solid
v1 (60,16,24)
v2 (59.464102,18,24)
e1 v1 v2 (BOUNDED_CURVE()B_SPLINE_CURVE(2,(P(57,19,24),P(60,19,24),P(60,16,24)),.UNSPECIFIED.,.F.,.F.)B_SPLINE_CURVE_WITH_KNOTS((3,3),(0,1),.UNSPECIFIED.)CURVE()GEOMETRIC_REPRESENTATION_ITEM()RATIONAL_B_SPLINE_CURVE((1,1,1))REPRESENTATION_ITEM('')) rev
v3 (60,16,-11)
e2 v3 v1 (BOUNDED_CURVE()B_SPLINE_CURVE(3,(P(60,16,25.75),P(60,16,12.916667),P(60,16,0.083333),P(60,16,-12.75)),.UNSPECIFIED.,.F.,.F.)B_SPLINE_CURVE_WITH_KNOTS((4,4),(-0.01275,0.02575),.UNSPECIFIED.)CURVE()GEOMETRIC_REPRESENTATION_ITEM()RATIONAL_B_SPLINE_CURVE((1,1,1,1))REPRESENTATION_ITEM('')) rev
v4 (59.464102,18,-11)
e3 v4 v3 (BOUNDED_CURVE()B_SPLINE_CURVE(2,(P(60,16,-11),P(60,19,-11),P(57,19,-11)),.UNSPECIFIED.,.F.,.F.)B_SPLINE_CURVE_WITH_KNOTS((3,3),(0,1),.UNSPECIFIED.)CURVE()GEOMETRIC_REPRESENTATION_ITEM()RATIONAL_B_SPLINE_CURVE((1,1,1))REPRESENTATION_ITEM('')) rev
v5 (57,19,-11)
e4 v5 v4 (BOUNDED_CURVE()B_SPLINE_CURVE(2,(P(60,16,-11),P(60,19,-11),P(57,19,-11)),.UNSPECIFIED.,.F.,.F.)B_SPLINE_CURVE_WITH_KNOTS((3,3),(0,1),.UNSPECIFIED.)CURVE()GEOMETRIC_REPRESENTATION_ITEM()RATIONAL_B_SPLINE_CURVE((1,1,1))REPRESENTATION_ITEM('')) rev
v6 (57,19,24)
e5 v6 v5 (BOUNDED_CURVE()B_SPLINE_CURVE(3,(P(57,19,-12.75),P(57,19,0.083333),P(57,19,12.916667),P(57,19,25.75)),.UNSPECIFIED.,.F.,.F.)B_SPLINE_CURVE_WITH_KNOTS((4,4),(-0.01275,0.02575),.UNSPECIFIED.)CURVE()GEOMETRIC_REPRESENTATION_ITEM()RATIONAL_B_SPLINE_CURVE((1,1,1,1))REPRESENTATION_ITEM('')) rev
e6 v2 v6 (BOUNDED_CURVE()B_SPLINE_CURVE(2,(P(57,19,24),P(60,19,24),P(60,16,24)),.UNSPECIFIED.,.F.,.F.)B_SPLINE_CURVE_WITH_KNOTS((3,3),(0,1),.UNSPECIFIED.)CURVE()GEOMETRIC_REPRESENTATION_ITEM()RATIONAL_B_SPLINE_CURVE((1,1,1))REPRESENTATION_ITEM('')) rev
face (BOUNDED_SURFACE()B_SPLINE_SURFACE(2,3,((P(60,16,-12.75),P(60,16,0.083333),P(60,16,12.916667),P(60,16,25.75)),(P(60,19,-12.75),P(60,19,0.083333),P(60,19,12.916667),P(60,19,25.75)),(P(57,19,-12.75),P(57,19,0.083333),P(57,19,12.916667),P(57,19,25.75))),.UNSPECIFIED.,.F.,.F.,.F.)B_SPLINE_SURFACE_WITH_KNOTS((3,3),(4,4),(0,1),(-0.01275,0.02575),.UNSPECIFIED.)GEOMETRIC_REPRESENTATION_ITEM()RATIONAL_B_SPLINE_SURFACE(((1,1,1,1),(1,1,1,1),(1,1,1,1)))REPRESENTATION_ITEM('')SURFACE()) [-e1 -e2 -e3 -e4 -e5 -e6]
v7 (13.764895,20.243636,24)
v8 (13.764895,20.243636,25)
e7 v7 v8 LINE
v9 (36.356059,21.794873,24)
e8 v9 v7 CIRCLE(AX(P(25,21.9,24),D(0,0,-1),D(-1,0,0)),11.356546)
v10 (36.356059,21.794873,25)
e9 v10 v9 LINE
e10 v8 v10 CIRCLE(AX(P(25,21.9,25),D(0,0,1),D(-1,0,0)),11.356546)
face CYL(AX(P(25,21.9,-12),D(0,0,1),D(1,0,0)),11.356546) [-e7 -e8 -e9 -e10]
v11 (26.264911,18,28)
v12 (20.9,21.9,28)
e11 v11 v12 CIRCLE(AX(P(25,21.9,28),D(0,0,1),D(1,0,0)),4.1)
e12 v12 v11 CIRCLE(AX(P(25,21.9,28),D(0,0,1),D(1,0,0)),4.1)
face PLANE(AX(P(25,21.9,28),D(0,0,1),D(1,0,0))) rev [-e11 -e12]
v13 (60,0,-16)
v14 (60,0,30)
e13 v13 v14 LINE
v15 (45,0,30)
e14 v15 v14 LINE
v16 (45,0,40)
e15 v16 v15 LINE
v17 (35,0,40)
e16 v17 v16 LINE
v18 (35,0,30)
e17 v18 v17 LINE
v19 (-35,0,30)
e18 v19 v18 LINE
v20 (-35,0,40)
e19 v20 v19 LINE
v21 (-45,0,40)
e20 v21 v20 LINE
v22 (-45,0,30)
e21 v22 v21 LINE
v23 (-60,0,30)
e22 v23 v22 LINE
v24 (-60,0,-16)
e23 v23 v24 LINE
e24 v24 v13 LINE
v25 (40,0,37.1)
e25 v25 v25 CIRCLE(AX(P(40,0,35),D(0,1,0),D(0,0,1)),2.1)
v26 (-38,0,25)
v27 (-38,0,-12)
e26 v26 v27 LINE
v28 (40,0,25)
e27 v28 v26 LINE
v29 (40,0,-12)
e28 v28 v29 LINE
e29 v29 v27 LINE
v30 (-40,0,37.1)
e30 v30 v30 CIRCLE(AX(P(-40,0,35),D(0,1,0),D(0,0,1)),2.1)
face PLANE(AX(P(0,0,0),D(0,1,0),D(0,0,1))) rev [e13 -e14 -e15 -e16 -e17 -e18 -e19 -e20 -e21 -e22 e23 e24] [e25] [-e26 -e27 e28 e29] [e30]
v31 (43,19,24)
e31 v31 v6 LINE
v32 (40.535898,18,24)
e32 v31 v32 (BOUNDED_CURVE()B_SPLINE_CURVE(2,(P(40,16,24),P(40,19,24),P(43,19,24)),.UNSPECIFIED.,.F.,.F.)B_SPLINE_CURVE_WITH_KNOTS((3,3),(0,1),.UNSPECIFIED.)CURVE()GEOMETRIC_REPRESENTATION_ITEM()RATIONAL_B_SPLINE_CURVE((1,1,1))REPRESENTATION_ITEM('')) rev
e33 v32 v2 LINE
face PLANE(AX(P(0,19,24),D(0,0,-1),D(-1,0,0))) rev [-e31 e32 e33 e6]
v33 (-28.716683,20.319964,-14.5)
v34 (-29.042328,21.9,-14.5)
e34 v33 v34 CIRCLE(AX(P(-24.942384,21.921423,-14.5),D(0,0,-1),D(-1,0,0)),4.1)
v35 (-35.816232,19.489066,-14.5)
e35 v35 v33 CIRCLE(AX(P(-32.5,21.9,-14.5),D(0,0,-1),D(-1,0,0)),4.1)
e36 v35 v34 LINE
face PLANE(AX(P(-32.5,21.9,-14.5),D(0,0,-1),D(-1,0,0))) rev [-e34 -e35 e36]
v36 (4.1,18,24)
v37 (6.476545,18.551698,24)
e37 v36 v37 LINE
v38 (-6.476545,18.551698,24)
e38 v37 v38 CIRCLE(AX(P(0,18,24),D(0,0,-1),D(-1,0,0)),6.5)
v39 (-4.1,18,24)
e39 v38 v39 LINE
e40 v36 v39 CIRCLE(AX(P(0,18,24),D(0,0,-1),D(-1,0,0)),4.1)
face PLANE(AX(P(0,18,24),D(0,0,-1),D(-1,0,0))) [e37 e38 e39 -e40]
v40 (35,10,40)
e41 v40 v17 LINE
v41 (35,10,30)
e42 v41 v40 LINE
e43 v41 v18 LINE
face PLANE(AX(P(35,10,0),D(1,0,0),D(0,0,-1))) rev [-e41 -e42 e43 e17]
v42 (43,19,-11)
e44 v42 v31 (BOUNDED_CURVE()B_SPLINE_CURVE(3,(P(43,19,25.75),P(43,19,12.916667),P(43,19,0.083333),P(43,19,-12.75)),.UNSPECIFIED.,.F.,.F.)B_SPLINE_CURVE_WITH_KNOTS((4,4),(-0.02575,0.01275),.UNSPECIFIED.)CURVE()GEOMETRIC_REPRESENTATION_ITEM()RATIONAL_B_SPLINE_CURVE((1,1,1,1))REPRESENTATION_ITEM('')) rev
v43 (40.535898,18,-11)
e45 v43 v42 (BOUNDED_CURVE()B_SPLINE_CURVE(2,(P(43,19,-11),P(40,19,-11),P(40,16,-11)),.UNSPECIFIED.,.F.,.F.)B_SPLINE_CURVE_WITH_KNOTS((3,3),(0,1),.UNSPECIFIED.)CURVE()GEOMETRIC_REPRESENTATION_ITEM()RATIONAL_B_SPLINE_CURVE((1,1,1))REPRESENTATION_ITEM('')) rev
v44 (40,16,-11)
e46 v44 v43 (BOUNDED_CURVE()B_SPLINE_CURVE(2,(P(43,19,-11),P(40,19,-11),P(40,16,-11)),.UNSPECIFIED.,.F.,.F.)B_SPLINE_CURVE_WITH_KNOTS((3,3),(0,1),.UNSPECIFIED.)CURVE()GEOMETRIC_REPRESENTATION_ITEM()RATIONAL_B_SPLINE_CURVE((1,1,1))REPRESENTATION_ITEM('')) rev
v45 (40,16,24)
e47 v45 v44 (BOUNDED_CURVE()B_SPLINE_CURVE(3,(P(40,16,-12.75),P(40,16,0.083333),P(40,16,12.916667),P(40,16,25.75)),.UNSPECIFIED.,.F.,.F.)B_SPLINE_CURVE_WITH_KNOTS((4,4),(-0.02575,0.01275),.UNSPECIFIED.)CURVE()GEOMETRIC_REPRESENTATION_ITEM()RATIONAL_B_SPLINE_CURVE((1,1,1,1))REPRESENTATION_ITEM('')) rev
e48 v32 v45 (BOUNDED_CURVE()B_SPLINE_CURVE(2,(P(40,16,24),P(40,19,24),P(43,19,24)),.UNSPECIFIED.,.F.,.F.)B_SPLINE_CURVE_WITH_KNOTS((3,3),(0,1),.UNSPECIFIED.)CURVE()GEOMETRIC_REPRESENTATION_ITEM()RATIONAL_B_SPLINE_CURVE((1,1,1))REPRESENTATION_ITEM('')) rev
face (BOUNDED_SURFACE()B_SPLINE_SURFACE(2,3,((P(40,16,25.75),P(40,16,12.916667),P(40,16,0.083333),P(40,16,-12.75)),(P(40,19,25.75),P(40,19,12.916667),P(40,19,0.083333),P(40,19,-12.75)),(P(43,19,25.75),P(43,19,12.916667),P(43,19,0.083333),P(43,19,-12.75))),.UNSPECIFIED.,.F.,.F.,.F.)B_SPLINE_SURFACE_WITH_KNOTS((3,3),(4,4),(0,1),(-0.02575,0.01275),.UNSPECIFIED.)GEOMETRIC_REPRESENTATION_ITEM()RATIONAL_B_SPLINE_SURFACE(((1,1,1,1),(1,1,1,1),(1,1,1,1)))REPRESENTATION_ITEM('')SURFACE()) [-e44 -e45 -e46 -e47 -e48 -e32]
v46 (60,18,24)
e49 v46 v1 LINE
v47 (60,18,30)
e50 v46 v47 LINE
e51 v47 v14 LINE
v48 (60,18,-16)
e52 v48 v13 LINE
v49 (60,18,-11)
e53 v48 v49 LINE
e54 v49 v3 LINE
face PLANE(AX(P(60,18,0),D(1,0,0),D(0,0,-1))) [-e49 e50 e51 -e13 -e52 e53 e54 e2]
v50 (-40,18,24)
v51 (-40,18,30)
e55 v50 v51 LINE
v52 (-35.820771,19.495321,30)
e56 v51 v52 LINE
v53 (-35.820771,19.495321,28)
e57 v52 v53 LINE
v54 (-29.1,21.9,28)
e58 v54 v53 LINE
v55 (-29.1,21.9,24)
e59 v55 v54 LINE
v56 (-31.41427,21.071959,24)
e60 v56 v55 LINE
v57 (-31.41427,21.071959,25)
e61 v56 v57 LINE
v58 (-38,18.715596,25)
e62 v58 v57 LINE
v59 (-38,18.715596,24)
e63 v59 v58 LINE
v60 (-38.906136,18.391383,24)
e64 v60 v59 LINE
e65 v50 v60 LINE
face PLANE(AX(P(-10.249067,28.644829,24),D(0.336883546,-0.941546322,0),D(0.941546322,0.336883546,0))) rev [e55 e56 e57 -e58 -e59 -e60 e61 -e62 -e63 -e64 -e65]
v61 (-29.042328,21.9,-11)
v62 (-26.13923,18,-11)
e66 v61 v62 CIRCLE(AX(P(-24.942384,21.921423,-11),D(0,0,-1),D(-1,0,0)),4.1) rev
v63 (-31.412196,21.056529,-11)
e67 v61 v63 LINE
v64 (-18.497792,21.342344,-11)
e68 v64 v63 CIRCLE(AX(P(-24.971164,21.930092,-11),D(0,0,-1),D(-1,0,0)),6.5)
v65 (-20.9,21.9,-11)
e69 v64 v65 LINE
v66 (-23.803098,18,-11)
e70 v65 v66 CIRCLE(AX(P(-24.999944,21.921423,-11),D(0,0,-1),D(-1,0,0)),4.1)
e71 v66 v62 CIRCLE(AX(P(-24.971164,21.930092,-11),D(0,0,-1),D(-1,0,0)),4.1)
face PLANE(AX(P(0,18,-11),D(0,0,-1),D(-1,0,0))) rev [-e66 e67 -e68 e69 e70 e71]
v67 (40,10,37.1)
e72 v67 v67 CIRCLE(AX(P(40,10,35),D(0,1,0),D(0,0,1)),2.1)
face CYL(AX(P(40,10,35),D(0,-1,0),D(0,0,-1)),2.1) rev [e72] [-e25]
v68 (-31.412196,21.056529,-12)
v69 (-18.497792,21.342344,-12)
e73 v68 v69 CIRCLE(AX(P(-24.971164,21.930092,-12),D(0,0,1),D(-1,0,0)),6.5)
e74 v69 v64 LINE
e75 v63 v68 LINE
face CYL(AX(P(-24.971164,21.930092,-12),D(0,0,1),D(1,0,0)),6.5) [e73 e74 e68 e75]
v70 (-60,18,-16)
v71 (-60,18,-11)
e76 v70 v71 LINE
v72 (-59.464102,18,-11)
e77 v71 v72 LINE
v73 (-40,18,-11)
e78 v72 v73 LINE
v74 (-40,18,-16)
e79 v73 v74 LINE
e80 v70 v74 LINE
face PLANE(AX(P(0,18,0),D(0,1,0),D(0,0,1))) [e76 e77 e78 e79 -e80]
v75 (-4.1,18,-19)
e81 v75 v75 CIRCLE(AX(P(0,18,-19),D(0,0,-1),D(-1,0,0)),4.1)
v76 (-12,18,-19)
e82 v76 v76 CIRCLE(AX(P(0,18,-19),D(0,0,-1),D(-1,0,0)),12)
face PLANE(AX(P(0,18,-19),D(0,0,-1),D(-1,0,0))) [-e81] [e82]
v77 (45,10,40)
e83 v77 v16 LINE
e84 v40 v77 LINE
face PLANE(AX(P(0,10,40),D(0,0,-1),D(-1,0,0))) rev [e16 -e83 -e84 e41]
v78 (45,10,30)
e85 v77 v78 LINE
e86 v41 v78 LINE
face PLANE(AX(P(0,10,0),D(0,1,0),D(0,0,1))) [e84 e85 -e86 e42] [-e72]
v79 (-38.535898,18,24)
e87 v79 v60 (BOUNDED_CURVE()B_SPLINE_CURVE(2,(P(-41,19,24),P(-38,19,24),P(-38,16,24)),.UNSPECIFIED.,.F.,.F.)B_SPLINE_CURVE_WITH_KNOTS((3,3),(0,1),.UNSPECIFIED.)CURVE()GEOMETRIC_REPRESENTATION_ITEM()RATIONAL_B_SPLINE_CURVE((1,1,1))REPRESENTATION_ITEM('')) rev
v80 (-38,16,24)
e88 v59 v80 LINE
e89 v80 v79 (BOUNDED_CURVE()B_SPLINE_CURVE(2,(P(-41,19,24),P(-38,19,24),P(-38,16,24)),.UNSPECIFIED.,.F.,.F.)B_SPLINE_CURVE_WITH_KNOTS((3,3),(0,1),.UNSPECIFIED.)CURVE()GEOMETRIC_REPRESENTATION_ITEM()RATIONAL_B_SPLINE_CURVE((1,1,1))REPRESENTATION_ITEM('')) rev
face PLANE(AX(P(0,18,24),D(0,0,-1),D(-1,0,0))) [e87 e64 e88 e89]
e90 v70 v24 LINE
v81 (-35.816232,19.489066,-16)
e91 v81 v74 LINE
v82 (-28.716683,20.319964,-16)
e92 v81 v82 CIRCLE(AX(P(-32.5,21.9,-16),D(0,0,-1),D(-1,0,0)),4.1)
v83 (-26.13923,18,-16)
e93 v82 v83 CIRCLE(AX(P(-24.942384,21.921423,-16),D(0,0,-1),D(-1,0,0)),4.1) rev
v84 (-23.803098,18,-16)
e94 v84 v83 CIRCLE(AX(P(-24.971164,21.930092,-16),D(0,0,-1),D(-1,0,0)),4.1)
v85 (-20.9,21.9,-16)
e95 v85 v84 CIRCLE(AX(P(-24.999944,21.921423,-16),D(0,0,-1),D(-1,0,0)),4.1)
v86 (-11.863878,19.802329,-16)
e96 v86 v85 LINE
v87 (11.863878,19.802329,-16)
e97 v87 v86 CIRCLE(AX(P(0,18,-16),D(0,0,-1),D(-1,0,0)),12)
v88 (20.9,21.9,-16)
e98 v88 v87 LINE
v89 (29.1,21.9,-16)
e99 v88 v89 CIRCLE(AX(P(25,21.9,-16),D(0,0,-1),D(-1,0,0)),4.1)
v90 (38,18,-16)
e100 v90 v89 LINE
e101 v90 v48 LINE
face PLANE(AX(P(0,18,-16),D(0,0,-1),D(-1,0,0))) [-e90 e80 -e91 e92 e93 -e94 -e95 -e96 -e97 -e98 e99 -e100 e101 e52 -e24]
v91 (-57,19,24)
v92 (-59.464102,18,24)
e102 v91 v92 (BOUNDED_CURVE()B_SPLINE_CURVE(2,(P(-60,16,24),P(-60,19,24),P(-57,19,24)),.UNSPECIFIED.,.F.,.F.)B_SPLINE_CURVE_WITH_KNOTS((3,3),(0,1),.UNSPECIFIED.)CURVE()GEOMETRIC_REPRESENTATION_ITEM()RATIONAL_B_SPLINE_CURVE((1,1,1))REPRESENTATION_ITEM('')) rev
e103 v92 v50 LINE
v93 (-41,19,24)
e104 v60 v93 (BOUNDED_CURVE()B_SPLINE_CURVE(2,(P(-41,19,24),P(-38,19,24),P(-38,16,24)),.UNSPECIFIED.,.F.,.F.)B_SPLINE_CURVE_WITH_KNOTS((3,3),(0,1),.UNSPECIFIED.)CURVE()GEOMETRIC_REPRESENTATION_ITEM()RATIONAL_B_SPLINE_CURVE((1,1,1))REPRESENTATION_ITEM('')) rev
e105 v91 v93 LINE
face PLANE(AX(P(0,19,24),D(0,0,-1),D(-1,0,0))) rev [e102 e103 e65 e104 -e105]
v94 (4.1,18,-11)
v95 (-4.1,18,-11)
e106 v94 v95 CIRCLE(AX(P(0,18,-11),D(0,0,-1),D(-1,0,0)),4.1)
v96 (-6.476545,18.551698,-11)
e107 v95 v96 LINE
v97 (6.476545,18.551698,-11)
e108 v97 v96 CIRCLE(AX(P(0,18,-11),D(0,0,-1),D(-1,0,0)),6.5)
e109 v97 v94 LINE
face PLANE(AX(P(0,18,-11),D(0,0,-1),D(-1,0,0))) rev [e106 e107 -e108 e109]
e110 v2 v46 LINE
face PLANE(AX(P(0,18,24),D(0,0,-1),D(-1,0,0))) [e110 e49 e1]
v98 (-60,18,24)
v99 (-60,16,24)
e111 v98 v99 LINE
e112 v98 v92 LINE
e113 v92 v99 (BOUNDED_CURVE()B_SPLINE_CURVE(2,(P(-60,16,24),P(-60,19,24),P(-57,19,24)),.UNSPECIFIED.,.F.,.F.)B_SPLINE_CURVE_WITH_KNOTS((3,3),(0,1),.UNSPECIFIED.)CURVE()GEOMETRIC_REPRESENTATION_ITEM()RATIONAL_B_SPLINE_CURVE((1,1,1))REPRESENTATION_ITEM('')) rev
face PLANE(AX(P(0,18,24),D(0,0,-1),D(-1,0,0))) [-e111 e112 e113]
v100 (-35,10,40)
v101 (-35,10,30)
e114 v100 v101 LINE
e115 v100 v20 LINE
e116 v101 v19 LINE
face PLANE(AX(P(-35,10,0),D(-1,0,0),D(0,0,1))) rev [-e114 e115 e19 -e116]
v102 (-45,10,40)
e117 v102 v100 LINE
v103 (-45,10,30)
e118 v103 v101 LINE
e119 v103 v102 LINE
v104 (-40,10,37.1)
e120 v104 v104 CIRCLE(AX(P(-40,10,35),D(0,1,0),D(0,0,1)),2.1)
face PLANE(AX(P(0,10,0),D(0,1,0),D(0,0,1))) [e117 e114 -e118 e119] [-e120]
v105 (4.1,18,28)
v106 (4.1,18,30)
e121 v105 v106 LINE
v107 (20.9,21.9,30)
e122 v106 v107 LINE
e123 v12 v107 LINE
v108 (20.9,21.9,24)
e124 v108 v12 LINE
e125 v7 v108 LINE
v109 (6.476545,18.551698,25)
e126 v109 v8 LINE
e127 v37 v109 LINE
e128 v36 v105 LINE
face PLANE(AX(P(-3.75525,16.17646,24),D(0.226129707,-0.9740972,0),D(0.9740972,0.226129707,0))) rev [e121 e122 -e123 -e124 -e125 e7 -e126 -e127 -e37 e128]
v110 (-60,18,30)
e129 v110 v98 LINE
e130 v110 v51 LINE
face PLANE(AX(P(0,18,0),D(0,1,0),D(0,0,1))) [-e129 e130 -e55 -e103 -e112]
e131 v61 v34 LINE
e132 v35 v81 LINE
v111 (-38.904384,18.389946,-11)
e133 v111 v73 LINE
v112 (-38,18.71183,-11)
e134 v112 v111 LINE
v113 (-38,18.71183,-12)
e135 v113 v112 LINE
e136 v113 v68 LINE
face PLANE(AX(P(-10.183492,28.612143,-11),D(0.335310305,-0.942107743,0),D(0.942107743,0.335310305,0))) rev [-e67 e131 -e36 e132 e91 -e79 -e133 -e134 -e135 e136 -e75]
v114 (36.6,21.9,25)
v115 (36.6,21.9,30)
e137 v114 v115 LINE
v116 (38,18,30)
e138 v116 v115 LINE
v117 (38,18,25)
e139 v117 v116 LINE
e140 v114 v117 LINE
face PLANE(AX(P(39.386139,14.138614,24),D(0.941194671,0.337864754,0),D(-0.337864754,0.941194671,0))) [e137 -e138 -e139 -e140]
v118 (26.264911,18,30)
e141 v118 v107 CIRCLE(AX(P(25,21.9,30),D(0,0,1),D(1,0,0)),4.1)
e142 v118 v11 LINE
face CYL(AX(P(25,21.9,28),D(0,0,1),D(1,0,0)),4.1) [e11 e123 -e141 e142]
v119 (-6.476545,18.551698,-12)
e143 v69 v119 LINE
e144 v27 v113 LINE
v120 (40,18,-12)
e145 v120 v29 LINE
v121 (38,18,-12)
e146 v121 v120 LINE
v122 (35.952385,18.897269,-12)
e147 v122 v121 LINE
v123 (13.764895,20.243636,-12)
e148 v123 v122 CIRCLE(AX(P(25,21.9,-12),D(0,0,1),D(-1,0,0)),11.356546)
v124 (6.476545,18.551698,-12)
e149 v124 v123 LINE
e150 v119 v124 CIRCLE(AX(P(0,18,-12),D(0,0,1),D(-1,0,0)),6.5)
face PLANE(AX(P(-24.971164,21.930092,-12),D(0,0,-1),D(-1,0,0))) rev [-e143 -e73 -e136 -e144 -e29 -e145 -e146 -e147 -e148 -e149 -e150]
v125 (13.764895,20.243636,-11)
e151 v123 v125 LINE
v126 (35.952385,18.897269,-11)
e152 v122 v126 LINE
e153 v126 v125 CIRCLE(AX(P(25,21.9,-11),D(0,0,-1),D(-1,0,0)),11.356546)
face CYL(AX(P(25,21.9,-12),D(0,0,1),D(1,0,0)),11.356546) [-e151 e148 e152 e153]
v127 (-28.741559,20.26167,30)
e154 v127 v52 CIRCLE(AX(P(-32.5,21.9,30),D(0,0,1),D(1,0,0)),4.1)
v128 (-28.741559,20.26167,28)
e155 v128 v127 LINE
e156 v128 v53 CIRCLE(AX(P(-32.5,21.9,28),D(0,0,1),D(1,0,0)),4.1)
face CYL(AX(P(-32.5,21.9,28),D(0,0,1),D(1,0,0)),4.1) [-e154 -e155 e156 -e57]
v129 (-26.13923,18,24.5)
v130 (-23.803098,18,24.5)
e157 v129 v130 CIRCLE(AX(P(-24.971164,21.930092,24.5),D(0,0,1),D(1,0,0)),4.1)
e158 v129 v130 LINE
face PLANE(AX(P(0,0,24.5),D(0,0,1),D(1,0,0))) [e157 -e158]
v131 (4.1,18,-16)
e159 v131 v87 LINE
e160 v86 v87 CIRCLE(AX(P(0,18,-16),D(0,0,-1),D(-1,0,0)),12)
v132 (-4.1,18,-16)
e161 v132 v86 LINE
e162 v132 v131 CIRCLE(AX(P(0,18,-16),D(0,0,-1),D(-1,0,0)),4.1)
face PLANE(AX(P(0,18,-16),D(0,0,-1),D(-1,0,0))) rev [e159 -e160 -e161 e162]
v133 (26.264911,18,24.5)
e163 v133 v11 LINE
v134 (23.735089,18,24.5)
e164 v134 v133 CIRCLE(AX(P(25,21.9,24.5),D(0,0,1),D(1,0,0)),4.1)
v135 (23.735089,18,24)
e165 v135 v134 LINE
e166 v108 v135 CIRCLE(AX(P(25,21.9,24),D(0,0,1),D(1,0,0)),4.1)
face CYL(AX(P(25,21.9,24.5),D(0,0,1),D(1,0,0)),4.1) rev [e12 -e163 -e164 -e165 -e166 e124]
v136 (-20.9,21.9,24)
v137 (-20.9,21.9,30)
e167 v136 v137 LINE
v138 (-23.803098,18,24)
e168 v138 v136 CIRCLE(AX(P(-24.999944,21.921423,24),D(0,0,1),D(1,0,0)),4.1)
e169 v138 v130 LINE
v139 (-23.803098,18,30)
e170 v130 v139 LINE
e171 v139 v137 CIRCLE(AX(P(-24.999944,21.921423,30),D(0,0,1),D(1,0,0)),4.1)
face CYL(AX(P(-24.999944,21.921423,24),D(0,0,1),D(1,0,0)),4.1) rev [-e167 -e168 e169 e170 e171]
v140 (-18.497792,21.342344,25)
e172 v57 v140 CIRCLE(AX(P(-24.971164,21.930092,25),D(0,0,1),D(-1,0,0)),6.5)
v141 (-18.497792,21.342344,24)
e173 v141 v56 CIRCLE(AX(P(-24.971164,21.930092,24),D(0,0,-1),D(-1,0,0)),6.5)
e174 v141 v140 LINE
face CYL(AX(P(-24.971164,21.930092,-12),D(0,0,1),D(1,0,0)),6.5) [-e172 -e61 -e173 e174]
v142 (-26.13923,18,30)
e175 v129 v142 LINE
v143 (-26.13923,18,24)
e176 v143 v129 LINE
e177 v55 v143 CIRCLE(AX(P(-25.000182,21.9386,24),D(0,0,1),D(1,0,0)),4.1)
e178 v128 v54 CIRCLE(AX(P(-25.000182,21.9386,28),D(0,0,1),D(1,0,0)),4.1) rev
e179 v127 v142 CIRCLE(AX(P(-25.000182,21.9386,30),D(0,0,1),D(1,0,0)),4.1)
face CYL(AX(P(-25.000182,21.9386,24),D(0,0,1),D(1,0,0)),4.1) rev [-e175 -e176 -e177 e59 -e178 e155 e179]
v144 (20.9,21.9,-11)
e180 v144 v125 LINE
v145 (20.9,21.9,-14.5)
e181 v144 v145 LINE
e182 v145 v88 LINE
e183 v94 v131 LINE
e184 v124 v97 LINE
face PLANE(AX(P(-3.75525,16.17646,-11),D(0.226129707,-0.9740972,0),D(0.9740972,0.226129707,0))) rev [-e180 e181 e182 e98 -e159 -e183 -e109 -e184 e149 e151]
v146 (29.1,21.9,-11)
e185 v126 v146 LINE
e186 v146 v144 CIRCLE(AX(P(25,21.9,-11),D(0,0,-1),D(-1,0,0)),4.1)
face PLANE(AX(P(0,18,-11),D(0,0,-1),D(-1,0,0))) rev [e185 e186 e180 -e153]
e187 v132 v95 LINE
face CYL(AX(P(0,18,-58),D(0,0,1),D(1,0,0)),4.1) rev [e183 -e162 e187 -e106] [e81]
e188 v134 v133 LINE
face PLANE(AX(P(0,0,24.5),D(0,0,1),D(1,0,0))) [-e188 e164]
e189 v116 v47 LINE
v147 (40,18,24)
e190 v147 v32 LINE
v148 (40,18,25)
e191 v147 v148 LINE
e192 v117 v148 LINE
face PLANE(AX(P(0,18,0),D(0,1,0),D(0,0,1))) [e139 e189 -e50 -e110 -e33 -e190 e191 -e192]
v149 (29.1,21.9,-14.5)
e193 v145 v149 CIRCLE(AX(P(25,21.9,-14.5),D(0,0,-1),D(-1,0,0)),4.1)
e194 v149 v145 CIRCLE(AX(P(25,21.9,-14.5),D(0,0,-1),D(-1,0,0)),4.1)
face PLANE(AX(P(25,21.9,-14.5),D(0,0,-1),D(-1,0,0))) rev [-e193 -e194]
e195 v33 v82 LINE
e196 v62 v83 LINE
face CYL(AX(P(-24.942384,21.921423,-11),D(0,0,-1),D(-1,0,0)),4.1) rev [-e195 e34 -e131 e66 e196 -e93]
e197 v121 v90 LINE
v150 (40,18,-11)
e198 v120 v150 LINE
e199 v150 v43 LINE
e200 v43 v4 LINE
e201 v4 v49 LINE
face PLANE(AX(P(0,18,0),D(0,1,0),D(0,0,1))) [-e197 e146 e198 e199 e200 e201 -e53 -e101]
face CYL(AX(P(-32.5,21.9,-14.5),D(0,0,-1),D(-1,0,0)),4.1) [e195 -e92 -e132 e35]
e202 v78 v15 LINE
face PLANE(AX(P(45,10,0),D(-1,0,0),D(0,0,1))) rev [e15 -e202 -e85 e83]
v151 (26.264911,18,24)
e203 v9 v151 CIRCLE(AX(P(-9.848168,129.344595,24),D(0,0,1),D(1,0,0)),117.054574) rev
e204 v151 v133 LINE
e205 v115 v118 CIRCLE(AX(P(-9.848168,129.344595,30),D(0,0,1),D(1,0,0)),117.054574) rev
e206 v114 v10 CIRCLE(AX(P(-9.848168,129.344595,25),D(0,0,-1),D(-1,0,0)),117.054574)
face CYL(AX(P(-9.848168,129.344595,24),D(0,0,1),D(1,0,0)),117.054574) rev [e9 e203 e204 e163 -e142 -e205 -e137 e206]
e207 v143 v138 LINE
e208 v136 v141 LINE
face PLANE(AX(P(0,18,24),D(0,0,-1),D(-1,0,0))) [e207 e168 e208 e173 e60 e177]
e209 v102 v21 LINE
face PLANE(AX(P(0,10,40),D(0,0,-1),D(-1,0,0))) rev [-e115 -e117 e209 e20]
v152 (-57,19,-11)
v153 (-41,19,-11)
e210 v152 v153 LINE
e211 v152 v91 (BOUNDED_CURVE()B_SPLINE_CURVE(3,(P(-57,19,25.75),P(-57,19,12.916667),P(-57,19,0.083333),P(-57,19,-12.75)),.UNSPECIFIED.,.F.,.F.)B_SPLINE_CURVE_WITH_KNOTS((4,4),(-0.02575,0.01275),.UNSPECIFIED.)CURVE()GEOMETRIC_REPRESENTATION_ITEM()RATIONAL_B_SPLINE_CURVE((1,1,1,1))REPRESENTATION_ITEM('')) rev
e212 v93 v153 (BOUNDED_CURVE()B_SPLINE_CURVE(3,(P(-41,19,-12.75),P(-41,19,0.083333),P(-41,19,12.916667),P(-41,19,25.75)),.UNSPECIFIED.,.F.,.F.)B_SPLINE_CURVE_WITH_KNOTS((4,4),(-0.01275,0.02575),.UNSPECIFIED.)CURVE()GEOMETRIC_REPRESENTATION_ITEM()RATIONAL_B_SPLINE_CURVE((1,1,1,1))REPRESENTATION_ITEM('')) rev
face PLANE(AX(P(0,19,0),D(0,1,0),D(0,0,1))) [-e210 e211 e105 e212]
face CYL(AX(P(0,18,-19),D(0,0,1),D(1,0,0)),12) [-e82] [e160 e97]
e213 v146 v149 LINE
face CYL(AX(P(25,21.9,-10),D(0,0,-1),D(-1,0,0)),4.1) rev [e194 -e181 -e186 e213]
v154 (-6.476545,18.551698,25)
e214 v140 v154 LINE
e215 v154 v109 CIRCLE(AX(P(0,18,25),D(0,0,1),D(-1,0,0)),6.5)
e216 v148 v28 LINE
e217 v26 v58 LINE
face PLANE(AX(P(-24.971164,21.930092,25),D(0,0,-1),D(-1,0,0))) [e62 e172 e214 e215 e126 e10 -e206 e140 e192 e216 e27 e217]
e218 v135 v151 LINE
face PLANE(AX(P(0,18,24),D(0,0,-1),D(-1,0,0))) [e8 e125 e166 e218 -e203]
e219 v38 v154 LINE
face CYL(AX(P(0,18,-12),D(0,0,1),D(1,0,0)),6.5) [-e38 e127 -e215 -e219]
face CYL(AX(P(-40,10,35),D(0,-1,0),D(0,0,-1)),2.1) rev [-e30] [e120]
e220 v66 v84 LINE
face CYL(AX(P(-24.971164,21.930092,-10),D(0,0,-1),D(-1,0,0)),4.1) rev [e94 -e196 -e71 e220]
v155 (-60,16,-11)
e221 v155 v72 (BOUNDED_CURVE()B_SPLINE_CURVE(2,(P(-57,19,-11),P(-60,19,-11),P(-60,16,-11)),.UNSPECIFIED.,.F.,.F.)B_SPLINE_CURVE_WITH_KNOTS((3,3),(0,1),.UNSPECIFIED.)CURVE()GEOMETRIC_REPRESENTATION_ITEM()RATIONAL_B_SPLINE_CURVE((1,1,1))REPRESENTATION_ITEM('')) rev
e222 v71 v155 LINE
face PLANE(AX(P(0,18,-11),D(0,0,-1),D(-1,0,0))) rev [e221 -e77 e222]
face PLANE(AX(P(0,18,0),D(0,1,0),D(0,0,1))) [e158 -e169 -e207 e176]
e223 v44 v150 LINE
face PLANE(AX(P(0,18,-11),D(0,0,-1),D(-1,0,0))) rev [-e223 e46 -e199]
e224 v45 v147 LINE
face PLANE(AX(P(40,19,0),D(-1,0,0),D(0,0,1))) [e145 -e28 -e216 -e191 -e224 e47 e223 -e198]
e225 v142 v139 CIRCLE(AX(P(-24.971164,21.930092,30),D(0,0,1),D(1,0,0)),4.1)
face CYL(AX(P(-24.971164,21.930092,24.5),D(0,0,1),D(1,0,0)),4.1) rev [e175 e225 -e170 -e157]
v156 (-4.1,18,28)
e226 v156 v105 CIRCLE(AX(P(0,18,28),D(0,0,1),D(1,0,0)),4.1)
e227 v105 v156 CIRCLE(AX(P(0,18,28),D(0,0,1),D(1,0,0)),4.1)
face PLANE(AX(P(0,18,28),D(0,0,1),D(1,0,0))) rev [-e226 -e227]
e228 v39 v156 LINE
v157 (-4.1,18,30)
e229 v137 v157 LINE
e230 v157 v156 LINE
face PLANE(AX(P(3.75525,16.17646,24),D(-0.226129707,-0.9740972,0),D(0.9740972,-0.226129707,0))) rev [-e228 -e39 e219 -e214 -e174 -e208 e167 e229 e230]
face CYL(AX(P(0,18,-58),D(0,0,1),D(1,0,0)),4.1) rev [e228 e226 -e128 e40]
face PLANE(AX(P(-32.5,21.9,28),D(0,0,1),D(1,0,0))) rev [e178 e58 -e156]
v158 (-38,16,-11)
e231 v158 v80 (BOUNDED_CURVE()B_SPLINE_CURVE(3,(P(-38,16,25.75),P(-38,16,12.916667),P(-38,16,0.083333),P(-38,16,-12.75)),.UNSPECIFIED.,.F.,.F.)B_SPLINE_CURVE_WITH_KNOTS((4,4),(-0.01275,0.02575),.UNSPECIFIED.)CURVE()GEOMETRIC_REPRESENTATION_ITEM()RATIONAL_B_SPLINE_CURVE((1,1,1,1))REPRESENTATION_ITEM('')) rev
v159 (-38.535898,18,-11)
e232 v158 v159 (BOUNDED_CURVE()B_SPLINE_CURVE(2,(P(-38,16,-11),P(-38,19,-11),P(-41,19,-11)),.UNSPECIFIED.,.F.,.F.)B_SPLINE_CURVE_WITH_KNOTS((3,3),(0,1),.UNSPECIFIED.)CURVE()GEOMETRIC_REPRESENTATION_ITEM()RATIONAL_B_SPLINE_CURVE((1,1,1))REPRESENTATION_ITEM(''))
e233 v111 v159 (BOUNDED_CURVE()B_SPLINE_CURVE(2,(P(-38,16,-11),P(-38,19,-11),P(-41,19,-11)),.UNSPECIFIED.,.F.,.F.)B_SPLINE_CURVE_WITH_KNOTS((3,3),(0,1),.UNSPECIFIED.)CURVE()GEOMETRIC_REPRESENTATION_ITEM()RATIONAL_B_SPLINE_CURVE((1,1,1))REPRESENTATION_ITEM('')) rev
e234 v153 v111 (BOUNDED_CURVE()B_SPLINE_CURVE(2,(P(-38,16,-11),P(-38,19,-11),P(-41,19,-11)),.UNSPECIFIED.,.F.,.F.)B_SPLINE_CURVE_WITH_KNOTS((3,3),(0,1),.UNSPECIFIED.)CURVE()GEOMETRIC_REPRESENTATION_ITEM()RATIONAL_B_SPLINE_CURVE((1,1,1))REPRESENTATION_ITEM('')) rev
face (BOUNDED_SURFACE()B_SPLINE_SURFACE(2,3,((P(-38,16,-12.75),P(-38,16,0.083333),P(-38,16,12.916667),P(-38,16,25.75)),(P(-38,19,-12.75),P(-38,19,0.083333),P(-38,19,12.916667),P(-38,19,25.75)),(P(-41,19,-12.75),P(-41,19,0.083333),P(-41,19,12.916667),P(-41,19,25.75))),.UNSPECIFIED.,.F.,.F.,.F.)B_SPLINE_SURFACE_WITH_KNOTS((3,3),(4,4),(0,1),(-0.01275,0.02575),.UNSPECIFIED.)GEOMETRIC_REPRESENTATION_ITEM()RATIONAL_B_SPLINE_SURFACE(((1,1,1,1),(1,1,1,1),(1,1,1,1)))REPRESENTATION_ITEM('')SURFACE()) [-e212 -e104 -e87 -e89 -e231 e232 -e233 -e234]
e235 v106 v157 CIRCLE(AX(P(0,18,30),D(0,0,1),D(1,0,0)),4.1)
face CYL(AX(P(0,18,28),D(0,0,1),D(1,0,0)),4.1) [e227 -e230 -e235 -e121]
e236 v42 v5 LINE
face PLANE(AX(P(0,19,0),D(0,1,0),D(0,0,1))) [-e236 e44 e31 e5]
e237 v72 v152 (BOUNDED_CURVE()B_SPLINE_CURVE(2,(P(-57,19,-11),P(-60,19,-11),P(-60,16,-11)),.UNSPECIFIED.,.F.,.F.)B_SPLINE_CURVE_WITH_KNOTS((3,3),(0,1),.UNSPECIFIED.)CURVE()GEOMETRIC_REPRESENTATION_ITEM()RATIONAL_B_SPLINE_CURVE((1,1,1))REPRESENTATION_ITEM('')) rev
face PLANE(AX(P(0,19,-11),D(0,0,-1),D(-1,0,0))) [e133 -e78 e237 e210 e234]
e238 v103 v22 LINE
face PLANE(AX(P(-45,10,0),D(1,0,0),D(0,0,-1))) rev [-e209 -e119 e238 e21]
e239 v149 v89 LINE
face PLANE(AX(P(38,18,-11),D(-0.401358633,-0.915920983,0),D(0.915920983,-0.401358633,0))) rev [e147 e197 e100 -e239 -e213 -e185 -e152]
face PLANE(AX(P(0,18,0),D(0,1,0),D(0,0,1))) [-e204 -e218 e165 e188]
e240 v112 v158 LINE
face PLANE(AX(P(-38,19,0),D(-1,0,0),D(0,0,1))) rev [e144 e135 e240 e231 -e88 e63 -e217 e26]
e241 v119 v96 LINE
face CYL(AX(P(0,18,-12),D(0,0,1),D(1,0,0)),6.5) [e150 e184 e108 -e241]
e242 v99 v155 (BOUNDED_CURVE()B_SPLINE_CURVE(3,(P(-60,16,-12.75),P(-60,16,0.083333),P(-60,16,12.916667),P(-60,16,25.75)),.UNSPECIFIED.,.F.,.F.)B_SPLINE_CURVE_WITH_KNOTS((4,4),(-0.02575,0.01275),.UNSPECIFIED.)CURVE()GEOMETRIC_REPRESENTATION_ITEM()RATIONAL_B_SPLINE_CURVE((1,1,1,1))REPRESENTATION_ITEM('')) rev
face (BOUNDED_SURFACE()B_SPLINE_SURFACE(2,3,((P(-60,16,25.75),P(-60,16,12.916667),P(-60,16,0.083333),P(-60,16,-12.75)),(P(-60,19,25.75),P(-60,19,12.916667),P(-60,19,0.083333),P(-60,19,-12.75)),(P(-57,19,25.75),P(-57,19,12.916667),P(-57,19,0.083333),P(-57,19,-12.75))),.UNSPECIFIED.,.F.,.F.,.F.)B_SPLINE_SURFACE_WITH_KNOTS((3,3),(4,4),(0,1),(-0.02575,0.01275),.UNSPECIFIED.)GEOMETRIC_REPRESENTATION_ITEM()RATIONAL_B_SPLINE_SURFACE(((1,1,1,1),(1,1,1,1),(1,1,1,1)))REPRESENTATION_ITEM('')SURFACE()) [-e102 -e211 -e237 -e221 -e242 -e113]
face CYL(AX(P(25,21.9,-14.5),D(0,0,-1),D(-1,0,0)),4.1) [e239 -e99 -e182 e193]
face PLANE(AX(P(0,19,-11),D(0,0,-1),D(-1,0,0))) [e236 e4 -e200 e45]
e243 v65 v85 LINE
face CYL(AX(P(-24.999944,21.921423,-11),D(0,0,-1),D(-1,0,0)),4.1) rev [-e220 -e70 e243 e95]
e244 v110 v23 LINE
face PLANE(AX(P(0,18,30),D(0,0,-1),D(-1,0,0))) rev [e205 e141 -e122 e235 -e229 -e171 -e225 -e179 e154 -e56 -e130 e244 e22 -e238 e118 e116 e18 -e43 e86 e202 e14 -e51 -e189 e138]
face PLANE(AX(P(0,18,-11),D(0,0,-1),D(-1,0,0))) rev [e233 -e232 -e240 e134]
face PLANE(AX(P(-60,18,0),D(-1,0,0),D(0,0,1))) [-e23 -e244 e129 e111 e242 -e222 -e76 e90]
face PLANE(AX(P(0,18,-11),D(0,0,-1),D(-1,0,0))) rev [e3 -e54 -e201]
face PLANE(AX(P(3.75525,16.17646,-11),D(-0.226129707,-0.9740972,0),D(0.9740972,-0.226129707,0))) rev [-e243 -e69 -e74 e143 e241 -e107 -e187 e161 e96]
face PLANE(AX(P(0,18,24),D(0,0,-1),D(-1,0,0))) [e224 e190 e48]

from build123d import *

# Parameters (mm, degrees)
SKETCH_1_5_W             = 10
SKETCH_1_5_H             = 10
SKETCH_1_5_R             = 2.1
EXTRUDE_4_DEPTH          = 10
EXTRUDE_4_2_DEPTH        = 10
SKETCH_1_6_W             = 10
SKETCH_1_6_H             = 10
SKETCH_1_6_R             = 2.1
EXTRUDE_5_DEPTH          = 35
SKETCH_1_W               = 20
SKETCH_1_H               = 35
EXTRUDE_7_DEPTH          = 19
SKETCH_1_W_2             = 22
EXTRUDE_7_2_DEPTH        = 19
FILLET_8_SIZE            = 3
FILLET_9_SIZE            = 3
EXTRUDE_8_DEPTH          = 18
SKETCH_2_W               = 37
SKETCH_2_H               = 30
CUT_EXTRUDE_2_DEPTH      = 138.800580637
CUT_EXTRUDE_3_DEPTH      = 113.111551644
CUT_EXTRUDE_3_DEPTH_BACK = 113.111551644
CUT_EXTRUDE_4_DEPTH      = 6
CUT_EXTRUDE_START        = -5.5
CUT_EXTRUDE_5_DEPTH      = 5.5
EXTRUDE_START            = 24
EXTRUDE_14_DEPTH         = 6
EXTRUDE_15_DEPTH         = 5
CUT_EXTRUDE_6_DEPTH      = 138.800580637
CUT_EXTRUDE_6_DEPTH_BACK = 138.800580637
EXTRUDE_START_2          = -2
SKETCH_10_R              = 4.1
EXTRUDE_17_DEPTH         = 2
SKETCH_11_R              = 4.1
EXTRUDE_18_DEPTH         = 1.5
EXTRUDE_19_DEPTH         = 6
CUT_EXTRUDE_7_DEPTH      = 36
CUT_EXTRUDE_7_DEPTH_BACK = 1
EXTRUDE_START_3          = 3
SKETCH_13_R              = 12
SKETCH_13_R_2            = 4.1
EXTRUDE_20_DEPTH         = 3
CUT_EXTRUDE_9_DEPTH      = 40


with BuildPart() as part:
    # Эскиз1<5> → Бобышка-Вытянуть4 (new body)
    with BuildSketch(Plane(origin=(0, 0, 0), x_dir=(1, 0, 0), z_dir=(0, 1, 0))):
        with Locations((-40, -35)):
            Rectangle(SKETCH_1_5_W, SKETCH_1_5_H)
        with Locations(Location((-40, -35, 0), (0, 0, 270))):
            Circle(SKETCH_1_5_R, mode=Mode.SUBTRACT)
    extrude(amount=EXTRUDE_4_DEPTH)



with BuildPart() as body_2:
    # Эскиз1<5> → Extrude 4 2 (new body)
    with BuildSketch(Plane(origin=(0, 0, 0), x_dir=(1, 0, 0), z_dir=(0, 1, 0))):
        with Locations((40, -35)):
            Rectangle(SKETCH_1_5_W, SKETCH_1_5_H)
        with Locations(Location((40, -35, 0), (0, 0, 270))):
            Circle(SKETCH_1_5_R, mode=Mode.SUBTRACT)
    extrude(amount=EXTRUDE_4_2_DEPTH)


with BuildPart() as body_3:
    # Эскиз1<6> → Бобышка-Вытянуть5 (new body)
    # profile 1 of 3: a face of its own
    with BuildSketch(Plane(origin=(0, 0, 0), x_dir=(1, 0, 0), z_dir=(0, 1, 0))):
        Polygon((45, 48), (35, 48), (-35, 48), (-45, 48), (-60, 48), (-60, 43), (-60, 16), (-55, 16), (-55, 43), (55, 43), (55, 16), (60, 16), (60, 43), (60, 48), align=None)
    # profile 2 of 3: a face of its own
    with BuildSketch(Plane(origin=(0, 0, 0), x_dir=(1, 0, 0), z_dir=(0, 1, 0))):
        with Locations((-40, 53)):
            Rectangle(SKETCH_1_6_W, SKETCH_1_6_H)
        with Locations(Location((-40, 53, 0), (0, 0, 270))):
            Circle(SKETCH_1_6_R, mode=Mode.SUBTRACT)
    # profile 3 of 3: a face of its own
    with BuildSketch(Plane(origin=(0, 0, 0), x_dir=(1, 0, 0), z_dir=(0, 1, 0))):
        with Locations((40, 53)):
            Rectangle(SKETCH_1_6_W, SKETCH_1_6_H)
        with Locations(Location((40, 53, 0), (0, 0, 270))):
            Circle(SKETCH_1_6_R, mode=Mode.SUBTRACT)
    extrude(amount=EXTRUDE_5_DEPTH)


with BuildPart() as body_4:
    # Эскиз1 → Бобышка-Вытянуть7 (new body)
    with BuildSketch(Plane(origin=(0, 0, 0), x_dir=(1, 0, 0), z_dir=(0, 1, 0))):
        with Locations((50, -6.5)):
            Rectangle(SKETCH_1_W, SKETCH_1_H)
    extrude(amount=EXTRUDE_7_DEPTH)

    # Скругление9
    # a fillet whose section is not a circle: 3 mm, written as the material it takes off along each edge
    with BuildSketch(Plane(origin=(40, 19, 31.5), x_dir=(0, -1, 0), z_dir=(0, 0, -1)), Plane(origin=(60, 19, -18.5), x_dir=(0, -1, 0), z_dir=(0, 0, 1))) as fillet_9_piece_1:
        with BuildLine():
            Bezier((FILLET_9_SIZE, 0), (0, 0), (0, -FILLET_9_SIZE), weights=[1, 1, 1])
            Line((0, -FILLET_9_SIZE), (0, 0))
            Line((0, 0), (FILLET_9_SIZE, 0))
        make_face()
    extrude(amount=50, mode=Mode.SUBTRACT)


with BuildPart() as body_5:
    # Эскиз1 → Extrude 7 2 (new body)
    with BuildSketch(Plane(origin=(0, 0, 0), x_dir=(1, 0, 0), z_dir=(0, 1, 0))):
        with Locations((-49, -6.5)):
            Rectangle(SKETCH_1_W_2, SKETCH_1_H)
    extrude(amount=EXTRUDE_7_2_DEPTH)

    # Скругление8
    # a fillet whose section is not a circle: 3 mm, written as the material it takes off along each edge
    with BuildSketch(Plane(origin=(-60, 19, -18.5), x_dir=(0, -1, 0), z_dir=(0, 0, 1)), Plane(origin=(-38, 19, 31.5), x_dir=(0, -1, 0), z_dir=(0, 0, -1))) as fillet_8_piece_1:
        with BuildLine():
            Bezier((FILLET_8_SIZE, 0), (0, 0), (0, FILLET_8_SIZE), weights=[1, 1, 1])
            Line((0, FILLET_8_SIZE), (0, 0))
            Line((0, 0), (FILLET_8_SIZE, 0))
        make_face()
    extrude(amount=50, mode=Mode.SUBTRACT)


with BuildPart() as part_1:
    add(part.part)

    add(body_2.part)  # Бобышка-Вытянуть8 merges body 2

    add(body_3.part)  # Бобышка-Вытянуть8 merges body 3

    add(body_4.part)  # Бобышка-Вытянуть8 merges body 4

    add(body_5.part)  # Бобышка-Вытянуть8 merges body 5
    # Эскиз1<9> → Бобышка-Вытянуть8 (add)
    with BuildSketch(Plane(origin=(0, 0, 0), x_dir=(1, 0, 0), z_dir=(0, 1, 0))):
        Polygon((-38, 11), (40, 11), (60, 11), (60, 16), (55, 16), (-55, 16), (-60, 16), (-60, 11), align=None)
        Polygon((40, -24), (60, -24), (60, -30), (45, -30), (35, -30), (-35, -30), (-45, -30), (-60, -30), (-60, -24), (-38, -24), align=None)
    extrude(amount=EXTRUDE_8_DEPTH)

    # Эскиз2 → Вырез-Вытянуть2 (cut, through all)
    with BuildSketch(Plane.ZY.offset(60)):
        with Locations((-39.5, 15)):
            Rectangle(SKETCH_2_W, SKETCH_2_H)
    extrude(amount=-CUT_EXTRUDE_2_DEPTH, mode=Mode.SUBTRACT)

    # Эскиз3 → Вырез-Вытянуть3 (cut, two sides: drawn at the far end of the back side and taken through both)
    with BuildSketch(Plane.XY.offset(30).offset(-CUT_EXTRUDE_3_DEPTH_BACK)):
        with BuildLine():
            Line((-4.1, 18), (4.1, 18))
            ThreePointArc((4.1, 18), (0, 13.9), (-4.1, 18))
        make_face()
    extrude(amount=CUT_EXTRUDE_3_DEPTH + CUT_EXTRUDE_3_DEPTH_BACK, mode=Mode.SUBTRACT)

    # Эскиз6 → Вырез-Вытянуть4 (cut)
    with BuildSketch(Plane(origin=(0, 0, -16), x_dir=(-1, 0, 0), z_dir=(0, 0, -1))):
        with BuildLine():
            Line((-26.264911064, 18), (-23.735088936, 18))
            ThreePointArc((-23.735088936, 18), (-25, 17.8), (-26.264911064, 18))
        make_face()
        with BuildLine():
            Line((23.803098267, 18), (26.13923016, 18))
            ThreePointArc((26.13923016, 18), (24.971164214, 17.830091849), (23.803098267, 18))
        make_face()
    extrude(amount=-CUT_EXTRUDE_4_DEPTH, mode=Mode.SUBTRACT)

    # Эскиз7 → Вырез-Вытянуть5 (cut)
    with BuildSketch(Plane.XY.offset(30).offset(CUT_EXTRUDE_START)):
        with BuildLine():
            Line((-26.13923016, 18), (-23.803098267, 18))
            ThreePointArc((-23.803098267, 18), (-24.971164214, 17.830091849), (-26.13923016, 18))
        make_face()
        with BuildLine():
            Line((23.735088936, 18), (26.264911064, 18))
            ThreePointArc((26.264911064, 18), (25, 17.8), (23.735088936, 18))
        make_face()
    extrude(amount=CUT_EXTRUDE_5_DEPTH, mode=Mode.SUBTRACT)

    # Бобышка-Вытянуть14: read off the stored shape, not the designer's step
    # Бобышка-Вытянуть14 outline → Бобышка-Вытянуть14 (add)
    with BuildSketch(Plane.XY.offset(EXTRUDE_START)):
        with BuildLine():
            ThreePointArc((23.735088935, 18), (21.68366653, 19.489205044), (20.9, 21.9))
            Line((20.9, 21.9), (4.1, 18))
            Line((4.1, 18), (23.735088935, 18))
        make_face()
        with BuildLine():
            ThreePointArc((-20.9, 21.9), (-21.711099928, 19.473259749), (-23.803098267, 18))
            Line((-23.803098267, 18), (-4.1, 18))
            Line((-4.1, 18), (-20.9, 21.9))
        make_face()
        with BuildLine():
            ThreePointArc((-26.13923016, 18), (-28.265749222, 19.45947321), (-29.1, 21.9))
            Line((-29.1, 21.9), (-40, 18))
            Line((-40, 18), (-26.13923016, 18))
        make_face()
    extrude(amount=EXTRUDE_14_DEPTH)

    # Эскиз6<6> → Бобышка-Вытянуть15 (add)
    with BuildSketch(Plane(origin=(0, 0, -16), x_dir=(-1, 0, 0), z_dir=(0, 0, -1))):
        with BuildLine():
            ThreePointArc((-23.735088936, 18), (-21.68366653, 19.489205044), (-20.9, 21.9))
            Line((-20.9, 21.9), (-4.1, 18))
            Line((-4.1, 18), (-23.735088936, 18))
        make_face()
        with BuildLine():
            ThreePointArc((20.9, 21.9), (21.711099928, 19.473259749), (23.803098267, 18))
            Line((23.803098267, 18), (4.1, 18))
            Line((4.1, 18), (20.9, 21.9))
        make_face()
        with BuildLine():
            Line((29.042328427, 21.9), (40, 18))
            Line((40, 18), (26.13923016, 18))
            ThreePointArc((26.13923016, 18), (28.2312285, 19.473259749), (29.042328427, 21.9))
        make_face()
        with BuildLine():
            Line((-38, 18), (-26.264911064, 18))
            ThreePointArc((-26.264911064, 18), (-28.31633347, 19.489205044), (-29.1, 21.9))
            Line((-29.1, 21.9), (-38, 18))
        make_face()
    extrude(amount=-EXTRUDE_15_DEPTH)

    # Эскиз9 → Вырез-Вытянуть6 (cut, two sides: drawn at the far end of the back side and taken through both)
    with BuildSketch(Plane.ZY.offset(60).offset(-CUT_EXTRUDE_6_DEPTH_BACK)):
        Polygon((-58, 34.891965128), (-58, 35), (-16, 35), (-16, 34.9), align=None)
    extrude(amount=CUT_EXTRUDE_6_DEPTH + CUT_EXTRUDE_6_DEPTH_BACK, mode=Mode.SUBTRACT)

    # Эскиз10 → Бобышка-Вытянуть17 (add)
    with BuildSketch(Plane.XY.offset(30).offset(EXTRUDE_START_2)):
        with Locations((25, 21.9)):
            Circle(SKETCH_10_R)
        with Locations((0, 18)):
            Circle(SKETCH_10_R)
        with Locations((-32.5, 21.9)):
            Circle(SKETCH_10_R)
    extrude(amount=EXTRUDE_17_DEPTH)

    # Эскиз11 → Бобышка-Вытянуть18 (add)
    with BuildSketch(Plane(origin=(0, 0, -16), x_dir=(-1, 0, 0), z_dir=(0, 0, -1))):
        with Locations((-25, 21.9)):
            Circle(SKETCH_11_R)
        with Locations((32.5, 21.9)):
            Circle(SKETCH_11_R)
    extrude(amount=-EXTRUDE_18_DEPTH)

    # Бобышка-Вытянуть19: read off the stored shape, not the designer's step
    # Бобышка-Вытянуть19 outline → Бобышка-Вытянуть19 (add)
    with BuildSketch(Plane.XY.offset(EXTRUDE_START)):
        with BuildLine():
            Line((26.264911064, 18), (38, 18))
            Line((38, 18), (36.6, 21.9))
            ThreePointArc((36.6, 21.9), (31.478486585, 19.828016661), (26.264911064, 18))
        make_face()
    extrude(amount=EXTRUDE_19_DEPTH)

    # Эскиз12 → Вырез-Вытянуть7 (cut, two sides: drawn at the far end of the back side and taken through both)
    with BuildSketch(Plane(origin=(0, 0, 24), x_dir=(-1, 0, 0), z_dir=(0, 0, -1)).offset(-CUT_EXTRUDE_7_DEPTH_BACK)):
        with BuildLine():
            Line((-40, 0), (-40, 18))
            Line((-40, 18), (-38, 18))
            Line((-38, 18), (-36.331975313, 22.6466402))
            ThreePointArc((-36.331975313, 22.6466402), (-26.202477843, 10.607295137), (-13.76489452, 20.243636228))
            Line((-13.76489452, 20.243636228), (-6.476544564, 18.551697845))
            ThreePointArc((-6.476544564, 18.551697845), (0, 11.5), (6.476544564, 18.551697845))
            Line((6.476544564, 18.551697845), (18.497791598, 21.342344478))
            ThreePointArc((18.497791598, 21.342344478), (24.835126866, 15.431515556), (31.414269621, 21.071958576))
            Line((31.414269621, 21.071958576), (38, 18.71559633))
            Line((38, 18.71559633), (38, 0))
            Line((38, 0), (-40, 0))
        make_face()
    extrude(amount=CUT_EXTRUDE_7_DEPTH + CUT_EXTRUDE_7_DEPTH_BACK, mode=Mode.SUBTRACT)

    # Эскиз13 → Бобышка-Вытянуть20 (add)
    with BuildSketch(Plane(origin=(0, 0, -16), x_dir=(-1, 0, 0), z_dir=(0, 0, -1)).offset(EXTRUDE_START_3)):
        with Locations(Location((0, 18, 0), (0, 0, 171.361826288))):
            Circle(SKETCH_13_R)
        with Locations((0, 18)):
            Circle(SKETCH_13_R_2, mode=Mode.SUBTRACT)
    extrude(amount=-EXTRUDE_20_DEPTH)

    # Эскиз14 → Вырез-Вытянуть9 (cut)
    with BuildSketch(Plane(origin=(0, 0, 0), x_dir=(-1, 0, 0), z_dir=(0, -1, 0))):
        Polygon((-55, 16), (-55, 43), (55, 43), (55, 16), (60, 16), (60, 63), (-60, 63), (-60, 16), align=None)
    extrude(amount=-CUT_EXTRUDE_9_DEPTH, mode=Mode.SUBTRACT)


solid = part_1.part
